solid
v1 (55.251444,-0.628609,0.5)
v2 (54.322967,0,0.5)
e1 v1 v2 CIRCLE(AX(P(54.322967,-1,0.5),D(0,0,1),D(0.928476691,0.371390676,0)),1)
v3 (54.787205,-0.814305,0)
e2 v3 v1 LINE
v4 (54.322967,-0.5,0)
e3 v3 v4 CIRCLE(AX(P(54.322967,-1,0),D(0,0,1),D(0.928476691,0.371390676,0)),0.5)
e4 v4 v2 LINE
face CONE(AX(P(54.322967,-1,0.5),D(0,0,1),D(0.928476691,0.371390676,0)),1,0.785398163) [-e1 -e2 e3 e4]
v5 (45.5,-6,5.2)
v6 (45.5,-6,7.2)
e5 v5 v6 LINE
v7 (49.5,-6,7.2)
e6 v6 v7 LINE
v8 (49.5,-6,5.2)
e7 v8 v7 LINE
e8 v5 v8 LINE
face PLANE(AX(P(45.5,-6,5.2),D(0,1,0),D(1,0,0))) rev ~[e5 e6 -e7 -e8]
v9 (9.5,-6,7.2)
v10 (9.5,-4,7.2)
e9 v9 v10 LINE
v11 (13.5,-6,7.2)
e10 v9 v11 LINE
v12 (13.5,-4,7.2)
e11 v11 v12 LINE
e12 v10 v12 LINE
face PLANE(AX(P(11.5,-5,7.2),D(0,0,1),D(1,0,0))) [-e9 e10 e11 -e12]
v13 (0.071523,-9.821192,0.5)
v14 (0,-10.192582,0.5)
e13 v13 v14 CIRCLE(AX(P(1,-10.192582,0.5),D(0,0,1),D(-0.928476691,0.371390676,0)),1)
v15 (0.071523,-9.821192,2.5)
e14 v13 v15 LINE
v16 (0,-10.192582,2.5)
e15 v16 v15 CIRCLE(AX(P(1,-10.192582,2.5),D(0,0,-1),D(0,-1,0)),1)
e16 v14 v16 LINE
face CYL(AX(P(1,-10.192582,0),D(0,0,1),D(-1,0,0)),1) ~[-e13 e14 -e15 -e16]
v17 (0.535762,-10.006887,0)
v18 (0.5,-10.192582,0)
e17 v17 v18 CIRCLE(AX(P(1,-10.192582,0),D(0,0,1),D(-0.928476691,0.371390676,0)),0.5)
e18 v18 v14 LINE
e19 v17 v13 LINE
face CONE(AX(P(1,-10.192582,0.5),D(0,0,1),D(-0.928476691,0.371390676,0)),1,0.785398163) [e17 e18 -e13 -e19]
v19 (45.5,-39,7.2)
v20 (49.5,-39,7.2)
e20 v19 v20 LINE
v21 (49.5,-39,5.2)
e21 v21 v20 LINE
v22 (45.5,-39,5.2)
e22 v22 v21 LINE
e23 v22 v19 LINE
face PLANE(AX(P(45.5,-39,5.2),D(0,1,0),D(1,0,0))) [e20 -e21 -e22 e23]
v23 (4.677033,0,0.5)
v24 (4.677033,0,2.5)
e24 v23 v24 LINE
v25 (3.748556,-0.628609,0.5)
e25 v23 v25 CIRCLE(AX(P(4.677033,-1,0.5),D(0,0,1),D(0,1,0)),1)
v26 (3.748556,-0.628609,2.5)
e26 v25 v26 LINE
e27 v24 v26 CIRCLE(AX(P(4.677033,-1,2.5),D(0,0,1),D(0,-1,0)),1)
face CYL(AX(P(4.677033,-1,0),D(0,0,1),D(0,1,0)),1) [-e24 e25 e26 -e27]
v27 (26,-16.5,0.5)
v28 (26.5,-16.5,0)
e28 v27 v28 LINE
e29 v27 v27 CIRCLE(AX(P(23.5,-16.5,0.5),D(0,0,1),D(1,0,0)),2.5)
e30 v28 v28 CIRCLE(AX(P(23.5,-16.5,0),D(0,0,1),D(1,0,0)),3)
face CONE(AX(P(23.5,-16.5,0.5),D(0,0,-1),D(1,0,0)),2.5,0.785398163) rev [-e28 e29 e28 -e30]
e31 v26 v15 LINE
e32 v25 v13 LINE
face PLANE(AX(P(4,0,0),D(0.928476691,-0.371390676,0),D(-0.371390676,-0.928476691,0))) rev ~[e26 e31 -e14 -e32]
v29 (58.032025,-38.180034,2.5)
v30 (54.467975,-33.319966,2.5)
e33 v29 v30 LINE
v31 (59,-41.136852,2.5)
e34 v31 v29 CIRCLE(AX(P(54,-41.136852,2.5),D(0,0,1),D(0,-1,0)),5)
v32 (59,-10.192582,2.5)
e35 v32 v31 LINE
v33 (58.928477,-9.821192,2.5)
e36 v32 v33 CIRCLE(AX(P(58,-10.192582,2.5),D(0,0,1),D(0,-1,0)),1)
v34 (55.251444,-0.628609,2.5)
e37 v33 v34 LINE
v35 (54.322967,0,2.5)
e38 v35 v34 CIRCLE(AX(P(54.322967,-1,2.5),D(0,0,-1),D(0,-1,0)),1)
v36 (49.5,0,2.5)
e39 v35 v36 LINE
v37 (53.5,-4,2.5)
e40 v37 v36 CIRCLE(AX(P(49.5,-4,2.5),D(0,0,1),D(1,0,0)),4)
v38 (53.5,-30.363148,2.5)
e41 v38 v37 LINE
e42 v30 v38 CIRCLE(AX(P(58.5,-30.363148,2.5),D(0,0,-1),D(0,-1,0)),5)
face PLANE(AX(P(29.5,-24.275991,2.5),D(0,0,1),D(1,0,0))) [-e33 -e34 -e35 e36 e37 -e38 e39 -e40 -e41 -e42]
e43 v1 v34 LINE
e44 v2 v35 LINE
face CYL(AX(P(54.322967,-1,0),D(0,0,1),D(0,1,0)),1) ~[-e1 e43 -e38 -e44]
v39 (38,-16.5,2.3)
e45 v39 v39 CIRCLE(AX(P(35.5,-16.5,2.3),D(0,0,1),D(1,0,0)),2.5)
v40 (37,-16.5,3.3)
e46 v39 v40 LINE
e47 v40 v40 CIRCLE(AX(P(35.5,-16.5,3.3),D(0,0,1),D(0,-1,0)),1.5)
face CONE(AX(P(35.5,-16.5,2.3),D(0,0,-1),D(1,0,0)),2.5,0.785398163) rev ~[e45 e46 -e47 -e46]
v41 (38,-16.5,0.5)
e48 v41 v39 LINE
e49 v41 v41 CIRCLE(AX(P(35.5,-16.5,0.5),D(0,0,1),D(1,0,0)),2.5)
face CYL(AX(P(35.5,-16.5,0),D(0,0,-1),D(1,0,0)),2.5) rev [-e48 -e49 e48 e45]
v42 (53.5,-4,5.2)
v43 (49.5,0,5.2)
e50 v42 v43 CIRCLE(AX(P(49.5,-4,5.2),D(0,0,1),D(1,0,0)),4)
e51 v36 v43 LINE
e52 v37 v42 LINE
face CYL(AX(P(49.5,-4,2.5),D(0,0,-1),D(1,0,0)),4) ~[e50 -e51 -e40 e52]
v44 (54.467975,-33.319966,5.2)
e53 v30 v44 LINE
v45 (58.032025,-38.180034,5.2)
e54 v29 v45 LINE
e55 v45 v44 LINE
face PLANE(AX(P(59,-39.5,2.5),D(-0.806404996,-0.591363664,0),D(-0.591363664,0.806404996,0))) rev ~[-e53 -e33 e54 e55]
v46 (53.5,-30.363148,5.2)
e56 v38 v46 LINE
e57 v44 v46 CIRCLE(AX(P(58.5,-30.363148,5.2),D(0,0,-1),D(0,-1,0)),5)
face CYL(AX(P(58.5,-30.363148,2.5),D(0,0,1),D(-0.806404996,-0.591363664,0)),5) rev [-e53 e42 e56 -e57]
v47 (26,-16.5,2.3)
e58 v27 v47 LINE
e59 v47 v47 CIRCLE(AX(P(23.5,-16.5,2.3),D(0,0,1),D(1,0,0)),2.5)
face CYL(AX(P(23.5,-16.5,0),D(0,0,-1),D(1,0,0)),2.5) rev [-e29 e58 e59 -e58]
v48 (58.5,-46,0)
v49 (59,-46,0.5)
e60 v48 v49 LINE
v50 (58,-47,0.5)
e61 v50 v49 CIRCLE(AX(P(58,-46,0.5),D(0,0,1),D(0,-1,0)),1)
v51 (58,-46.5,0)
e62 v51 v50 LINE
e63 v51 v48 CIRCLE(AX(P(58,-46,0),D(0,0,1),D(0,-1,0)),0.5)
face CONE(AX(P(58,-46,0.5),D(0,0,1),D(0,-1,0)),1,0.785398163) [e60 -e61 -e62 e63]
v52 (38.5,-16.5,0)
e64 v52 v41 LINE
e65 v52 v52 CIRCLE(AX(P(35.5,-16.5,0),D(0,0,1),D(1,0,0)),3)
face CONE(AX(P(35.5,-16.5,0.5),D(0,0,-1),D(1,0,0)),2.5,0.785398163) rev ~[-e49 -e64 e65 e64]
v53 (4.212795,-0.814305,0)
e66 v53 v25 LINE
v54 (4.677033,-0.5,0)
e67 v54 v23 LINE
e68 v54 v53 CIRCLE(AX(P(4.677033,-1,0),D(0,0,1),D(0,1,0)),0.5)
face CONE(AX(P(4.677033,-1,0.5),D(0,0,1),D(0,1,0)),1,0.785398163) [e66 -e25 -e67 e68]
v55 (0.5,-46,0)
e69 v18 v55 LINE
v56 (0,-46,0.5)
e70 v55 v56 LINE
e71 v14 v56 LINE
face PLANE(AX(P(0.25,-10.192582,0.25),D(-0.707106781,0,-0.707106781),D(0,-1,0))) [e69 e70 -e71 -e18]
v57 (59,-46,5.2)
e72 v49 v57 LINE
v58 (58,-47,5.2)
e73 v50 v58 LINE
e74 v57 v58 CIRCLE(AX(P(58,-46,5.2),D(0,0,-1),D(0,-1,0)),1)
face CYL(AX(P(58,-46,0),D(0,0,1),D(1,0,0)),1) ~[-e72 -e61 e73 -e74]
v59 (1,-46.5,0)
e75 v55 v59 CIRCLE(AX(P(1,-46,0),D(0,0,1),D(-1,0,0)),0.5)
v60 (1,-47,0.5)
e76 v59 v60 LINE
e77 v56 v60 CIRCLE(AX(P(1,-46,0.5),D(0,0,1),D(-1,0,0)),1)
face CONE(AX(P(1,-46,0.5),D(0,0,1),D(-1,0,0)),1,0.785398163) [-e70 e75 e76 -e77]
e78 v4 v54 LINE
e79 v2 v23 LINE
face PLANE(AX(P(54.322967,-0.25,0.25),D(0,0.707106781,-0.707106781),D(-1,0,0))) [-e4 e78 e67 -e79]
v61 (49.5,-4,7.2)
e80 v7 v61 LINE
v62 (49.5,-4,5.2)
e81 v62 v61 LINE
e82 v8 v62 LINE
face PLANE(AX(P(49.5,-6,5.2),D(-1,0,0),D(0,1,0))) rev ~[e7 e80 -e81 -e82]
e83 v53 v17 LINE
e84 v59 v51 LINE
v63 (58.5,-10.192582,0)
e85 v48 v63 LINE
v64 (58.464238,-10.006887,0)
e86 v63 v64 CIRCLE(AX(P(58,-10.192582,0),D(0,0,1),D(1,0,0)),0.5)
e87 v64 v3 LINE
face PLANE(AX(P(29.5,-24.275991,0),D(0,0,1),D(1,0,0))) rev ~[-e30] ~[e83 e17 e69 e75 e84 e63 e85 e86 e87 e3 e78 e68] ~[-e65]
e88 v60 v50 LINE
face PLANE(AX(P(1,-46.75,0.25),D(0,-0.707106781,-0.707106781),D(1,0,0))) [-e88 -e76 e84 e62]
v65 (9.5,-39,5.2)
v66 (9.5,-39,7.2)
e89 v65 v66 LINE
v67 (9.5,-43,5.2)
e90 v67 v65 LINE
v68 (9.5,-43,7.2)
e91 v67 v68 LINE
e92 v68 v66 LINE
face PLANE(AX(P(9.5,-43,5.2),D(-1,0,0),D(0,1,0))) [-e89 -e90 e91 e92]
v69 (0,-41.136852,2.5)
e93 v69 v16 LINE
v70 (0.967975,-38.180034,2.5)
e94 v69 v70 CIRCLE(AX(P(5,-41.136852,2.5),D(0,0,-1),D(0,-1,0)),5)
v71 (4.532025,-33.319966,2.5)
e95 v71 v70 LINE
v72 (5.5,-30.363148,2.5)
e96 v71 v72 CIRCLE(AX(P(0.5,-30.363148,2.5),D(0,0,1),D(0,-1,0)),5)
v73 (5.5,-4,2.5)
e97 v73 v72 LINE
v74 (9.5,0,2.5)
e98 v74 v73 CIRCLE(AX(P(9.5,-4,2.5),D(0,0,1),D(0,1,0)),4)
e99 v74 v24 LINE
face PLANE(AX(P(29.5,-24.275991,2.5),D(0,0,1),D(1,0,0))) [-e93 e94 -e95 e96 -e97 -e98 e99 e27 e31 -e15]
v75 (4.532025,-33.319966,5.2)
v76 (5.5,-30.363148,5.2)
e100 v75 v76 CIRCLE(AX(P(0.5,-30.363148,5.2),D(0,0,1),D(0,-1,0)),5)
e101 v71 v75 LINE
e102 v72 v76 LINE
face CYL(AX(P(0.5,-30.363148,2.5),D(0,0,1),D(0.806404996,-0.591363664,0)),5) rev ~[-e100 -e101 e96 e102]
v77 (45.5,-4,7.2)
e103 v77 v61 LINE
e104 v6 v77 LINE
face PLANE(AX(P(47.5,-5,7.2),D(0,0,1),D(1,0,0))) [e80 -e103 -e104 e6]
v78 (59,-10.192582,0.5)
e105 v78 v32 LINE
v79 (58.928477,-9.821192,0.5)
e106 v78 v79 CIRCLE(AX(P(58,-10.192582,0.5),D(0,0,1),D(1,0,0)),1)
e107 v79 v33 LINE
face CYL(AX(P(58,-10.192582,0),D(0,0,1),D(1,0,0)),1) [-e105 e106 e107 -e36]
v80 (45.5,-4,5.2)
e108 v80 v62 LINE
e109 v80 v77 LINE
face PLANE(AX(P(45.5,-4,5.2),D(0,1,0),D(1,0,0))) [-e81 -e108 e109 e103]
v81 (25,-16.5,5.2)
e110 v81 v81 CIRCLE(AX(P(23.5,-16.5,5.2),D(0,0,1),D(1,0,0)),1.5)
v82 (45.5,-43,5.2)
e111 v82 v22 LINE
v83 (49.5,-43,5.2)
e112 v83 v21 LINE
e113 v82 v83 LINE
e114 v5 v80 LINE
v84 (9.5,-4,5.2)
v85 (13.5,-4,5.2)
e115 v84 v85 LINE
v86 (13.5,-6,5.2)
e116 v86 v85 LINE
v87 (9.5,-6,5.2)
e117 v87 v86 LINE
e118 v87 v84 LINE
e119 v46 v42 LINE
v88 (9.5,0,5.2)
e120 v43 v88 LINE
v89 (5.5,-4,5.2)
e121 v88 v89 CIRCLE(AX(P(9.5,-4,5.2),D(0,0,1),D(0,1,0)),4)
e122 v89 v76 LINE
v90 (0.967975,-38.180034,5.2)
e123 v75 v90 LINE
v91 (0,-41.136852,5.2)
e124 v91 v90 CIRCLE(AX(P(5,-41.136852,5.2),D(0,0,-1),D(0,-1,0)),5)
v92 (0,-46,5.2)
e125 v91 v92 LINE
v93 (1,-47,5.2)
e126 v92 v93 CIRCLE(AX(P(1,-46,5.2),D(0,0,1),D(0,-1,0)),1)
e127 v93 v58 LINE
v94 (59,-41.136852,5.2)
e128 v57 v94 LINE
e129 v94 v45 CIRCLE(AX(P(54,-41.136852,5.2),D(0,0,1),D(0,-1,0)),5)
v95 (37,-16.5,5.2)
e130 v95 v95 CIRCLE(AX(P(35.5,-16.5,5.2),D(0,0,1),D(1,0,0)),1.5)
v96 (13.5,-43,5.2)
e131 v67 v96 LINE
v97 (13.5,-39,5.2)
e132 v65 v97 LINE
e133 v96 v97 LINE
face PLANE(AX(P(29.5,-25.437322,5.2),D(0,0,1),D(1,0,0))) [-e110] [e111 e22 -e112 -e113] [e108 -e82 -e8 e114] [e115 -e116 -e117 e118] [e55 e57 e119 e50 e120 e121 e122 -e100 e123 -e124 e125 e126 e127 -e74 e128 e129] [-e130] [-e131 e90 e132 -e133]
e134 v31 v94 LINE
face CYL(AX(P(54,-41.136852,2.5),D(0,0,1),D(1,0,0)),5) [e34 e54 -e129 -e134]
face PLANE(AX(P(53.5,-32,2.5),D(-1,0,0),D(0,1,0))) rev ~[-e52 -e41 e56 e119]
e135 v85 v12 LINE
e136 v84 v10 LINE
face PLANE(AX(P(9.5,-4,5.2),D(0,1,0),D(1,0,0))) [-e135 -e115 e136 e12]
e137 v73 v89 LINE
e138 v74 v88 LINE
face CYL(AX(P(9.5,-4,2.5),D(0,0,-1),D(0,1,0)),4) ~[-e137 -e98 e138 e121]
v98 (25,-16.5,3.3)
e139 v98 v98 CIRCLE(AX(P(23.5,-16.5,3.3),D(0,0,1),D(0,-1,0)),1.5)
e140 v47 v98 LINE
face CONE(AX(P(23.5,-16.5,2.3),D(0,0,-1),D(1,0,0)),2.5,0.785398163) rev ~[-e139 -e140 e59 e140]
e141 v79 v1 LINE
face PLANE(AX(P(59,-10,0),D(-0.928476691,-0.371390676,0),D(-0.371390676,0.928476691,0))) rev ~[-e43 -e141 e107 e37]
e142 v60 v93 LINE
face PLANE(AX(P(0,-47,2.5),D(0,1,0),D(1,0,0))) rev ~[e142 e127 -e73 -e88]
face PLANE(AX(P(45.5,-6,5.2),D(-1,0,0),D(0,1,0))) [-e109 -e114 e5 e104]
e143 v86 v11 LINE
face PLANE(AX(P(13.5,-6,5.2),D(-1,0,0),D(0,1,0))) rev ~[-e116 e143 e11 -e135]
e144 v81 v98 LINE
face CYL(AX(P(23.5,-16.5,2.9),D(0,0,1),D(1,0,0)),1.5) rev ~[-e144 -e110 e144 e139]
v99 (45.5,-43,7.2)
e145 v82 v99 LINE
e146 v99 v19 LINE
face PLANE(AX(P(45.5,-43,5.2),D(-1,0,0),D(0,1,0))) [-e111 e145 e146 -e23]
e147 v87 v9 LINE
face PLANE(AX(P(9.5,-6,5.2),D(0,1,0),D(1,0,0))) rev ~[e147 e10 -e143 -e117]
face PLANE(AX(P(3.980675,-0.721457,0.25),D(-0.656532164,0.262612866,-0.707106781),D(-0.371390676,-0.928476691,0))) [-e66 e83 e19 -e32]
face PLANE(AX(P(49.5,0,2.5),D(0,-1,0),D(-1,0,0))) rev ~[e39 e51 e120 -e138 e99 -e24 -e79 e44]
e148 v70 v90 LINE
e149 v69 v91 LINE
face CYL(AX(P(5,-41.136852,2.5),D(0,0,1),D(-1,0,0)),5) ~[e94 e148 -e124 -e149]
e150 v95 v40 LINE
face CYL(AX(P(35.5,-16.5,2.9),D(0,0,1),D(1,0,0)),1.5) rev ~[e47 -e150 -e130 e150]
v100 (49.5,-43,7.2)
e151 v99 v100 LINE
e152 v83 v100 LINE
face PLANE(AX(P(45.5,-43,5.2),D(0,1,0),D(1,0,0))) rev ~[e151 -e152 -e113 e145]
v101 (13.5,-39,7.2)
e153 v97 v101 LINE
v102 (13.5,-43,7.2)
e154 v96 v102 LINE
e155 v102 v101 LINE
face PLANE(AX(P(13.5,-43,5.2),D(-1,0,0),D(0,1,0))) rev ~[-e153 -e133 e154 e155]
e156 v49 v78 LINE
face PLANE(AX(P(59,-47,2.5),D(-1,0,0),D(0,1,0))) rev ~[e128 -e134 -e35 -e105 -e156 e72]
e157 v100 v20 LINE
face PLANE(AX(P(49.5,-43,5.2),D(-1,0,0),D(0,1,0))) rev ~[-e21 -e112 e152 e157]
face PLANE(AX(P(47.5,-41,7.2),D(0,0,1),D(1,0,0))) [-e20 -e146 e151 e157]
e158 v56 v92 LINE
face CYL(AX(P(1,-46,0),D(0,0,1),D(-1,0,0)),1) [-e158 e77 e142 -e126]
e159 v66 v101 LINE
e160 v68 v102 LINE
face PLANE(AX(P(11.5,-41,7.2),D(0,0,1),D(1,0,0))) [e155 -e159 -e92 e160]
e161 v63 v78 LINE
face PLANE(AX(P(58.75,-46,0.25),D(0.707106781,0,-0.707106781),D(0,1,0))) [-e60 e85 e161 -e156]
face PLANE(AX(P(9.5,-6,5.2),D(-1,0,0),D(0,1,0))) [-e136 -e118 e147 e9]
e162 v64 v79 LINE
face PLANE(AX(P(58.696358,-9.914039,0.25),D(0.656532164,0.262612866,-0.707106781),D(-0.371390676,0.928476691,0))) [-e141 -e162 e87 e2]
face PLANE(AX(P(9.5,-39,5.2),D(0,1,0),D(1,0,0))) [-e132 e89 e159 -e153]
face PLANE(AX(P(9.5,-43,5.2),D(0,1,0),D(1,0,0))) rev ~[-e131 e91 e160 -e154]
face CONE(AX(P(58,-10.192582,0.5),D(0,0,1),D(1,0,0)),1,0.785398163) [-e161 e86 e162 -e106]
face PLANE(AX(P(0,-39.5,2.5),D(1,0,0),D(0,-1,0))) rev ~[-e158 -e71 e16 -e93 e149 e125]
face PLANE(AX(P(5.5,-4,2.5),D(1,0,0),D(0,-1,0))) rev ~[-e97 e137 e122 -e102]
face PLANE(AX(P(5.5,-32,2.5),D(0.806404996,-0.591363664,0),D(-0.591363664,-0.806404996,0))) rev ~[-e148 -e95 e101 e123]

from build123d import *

# Parameters (mm, degrees)
F1_DEPTH      = 2.5
F3_DEPTH      = 2.7
F4_R          = 1
F5_R          = 5
F6_W          = 4
F6_H          = 2
F6_H_2        = 4
F7_DEPTH      = 2
F8_R          = 1.5
F9_DEPTH      = 6
F10_R         = 2.5
F11_DEPTH     = 3.5
F12_S5_R      = 1.5
F12_T6_DEPTH  = 5
F12_S11_R     = 1.5
F12_T12_DEPTH = 5
F13_SIZE      = 0.5


# Not quite as in the source:
# - a fillet or chamfer that OpenCascade refuses, or shapes differently, is made with other operations: its cross-section is extruded or revolved along the edge and cut away or added


with BuildPart() as f1:
    # F0 (on Top) → F1 (new body)
    with BuildSketch(Plane.XY):
        Polygon((55, 0), (4, 0), (0, -10), (0, -47), (59, -47), (59, -10), align=None)
    extrude(amount=F1_DEPTH)

    # F2 (on face) → F3 (join)
    with BuildSketch(Plane.XY.offset(2.5)):
        with BuildLine():
            Line((0, -39.5), (0, -47))
            Line((0, -47), (59, -47))
            Line((59, -47), (59, -39.5))
            Line((59, -39.5), (53.5, -32))
            Line((53.5, -32), (53.5, -4))
            ThreePointArc((53.5, -4), (52.3284271247, -1.1715728753), (49.5, 0))
            Line((49.5, 0), (9.5, 0))
            ThreePointArc((9.5, 0), (6.6715728753, -1.1715728753), (5.5, -4))
            Line((5.5, -4), (5.5, -32))
            Line((5.5, -32), (0, -39.5))
        make_face()
    extrude(amount=F3_DEPTH)

    # F4
    f4_edges = [f1.edges().sort_by_distance(p)[0] for p in [
        (0, -47, 2.6),
        (59, -47, 2.6),
        (4, 0, 1.25),
        (55, 0, 1.25),
        (59, -10, 1.25),
        (0, -10, 1.25),
    ]]
    fillet(f4_edges, radius=F4_R)

    # F5
    f5_edges = [f1.edges().sort_by_distance(p)[0] for p in [
        (0, -39.5, 3.85),
        (59, -39.5, 3.85),
        (53.5, -32, 3.85),
        (5.5, -32, 3.85),
    ]]
    fillet(f5_edges, radius=F5_R)

    # F6 (on face) → F7 (join)
    with BuildSketch(Plane.XY.offset(5.2)):
        with Locations((11.5, -5)):
            Rectangle(F6_W, F6_H)
        with Locations((11.5, -41)):
            Rectangle(F6_W, F6_H_2)
        with Locations((47.5, -5)):
            Rectangle(F6_W, F6_H)
        with Locations((47.5, -41)):
            Rectangle(F6_W, F6_H_2)
    extrude(amount=F7_DEPTH)

    # F8 (on face) → F9 (cut)
    with BuildSketch(Plane.XY.offset(5.2)):
        with Locations((23.5, -16.5)):
            Circle(F8_R)
        with Locations((35.5, -16.5)):
            Circle(F8_R)
    extrude(amount=-F9_DEPTH, mode=Mode.SUBTRACT)

    # F10 (on face) → F11 (cut)
    with BuildSketch(Plane.XY):
        with Locations((35.5, -16.5)):
            Circle(F10_R)
        with Locations((23.5, -16.5)):
            Circle(F10_R)
    extrude(amount=F11_DEPTH, mode=Mode.SUBTRACT)

    # F12: chamfer of 1.2 on 2 edges, made by hand


with BuildPart() as f12_tool2:
    # F12_s3 → F12_t4 (revolve)
    with BuildSketch(Plane.XZ.offset(16.5)):
        Polygon((38, 2.3), (36.8, 3.5), (38, 3.5), align=None)
    revolve(axis=Axis((35.5, -16.5, 3.5), (0, 0, 1)))

    # F12_s5 → F12_t6 (cut, symmetric)
    with BuildSketch(Plane.XY.offset(2.9)):
        with Locations((35.5, -16.5)):
            Circle(F12_S5_R)
    extrude(amount=F12_T6_DEPTH, both=True, mode=Mode.SUBTRACT)


with BuildPart() as f1_1:
    add(f1.part)

    # F12_t1: union F12_tool2
    add(f12_tool2.part)


with BuildPart() as f12_tool8:
    # F12_s9 → F12_t10 (revolve)
    with BuildSketch(Plane.XZ.offset(16.5)):
        Polygon((26, 2.3), (24.8, 3.5), (26, 3.5), align=None)
    revolve(axis=Axis((23.5, -16.5, 3.5), (0, 0, 1)))

    # F12_s11 → F12_t12 (cut, symmetric)
    with BuildSketch(Plane.XY.offset(2.9)):
        with Locations((23.5, -16.5)):
            Circle(F12_S11_R)
    extrude(amount=F12_T12_DEPTH, both=True, mode=Mode.SUBTRACT)


with BuildPart() as f1_2:
    add(f1_1.part)

    # F12_t7: union F12_tool8
    add(f12_tool8.part)

    # F13
    f13_edges = [f1_2.edges().sort_by_distance(p)[0] for p in [
        (29.5, 0, 0),
        (54.883596, -0.171933, 0),
        (4.116404, -0.171933, 0),
        (57.08996, -5.224901, 0),
        (1.91004, -5.224901, 0),
        (58.981956, -10.003475, 0),
        (0.018044, -10.003475, 0),
        (59, -28.096291, 0),
        (0, -28.096291, 0),
        (58.707107, -46.707107, 0),
        (0.292893, -46.707107, 0),
        (29.5, -47, 0),
        (21, -16.5, 0),
        (33, -16.5, 0),
    ]]
    chamfer(f13_edges, length=F13_SIZE)


solid = f1_2.part
